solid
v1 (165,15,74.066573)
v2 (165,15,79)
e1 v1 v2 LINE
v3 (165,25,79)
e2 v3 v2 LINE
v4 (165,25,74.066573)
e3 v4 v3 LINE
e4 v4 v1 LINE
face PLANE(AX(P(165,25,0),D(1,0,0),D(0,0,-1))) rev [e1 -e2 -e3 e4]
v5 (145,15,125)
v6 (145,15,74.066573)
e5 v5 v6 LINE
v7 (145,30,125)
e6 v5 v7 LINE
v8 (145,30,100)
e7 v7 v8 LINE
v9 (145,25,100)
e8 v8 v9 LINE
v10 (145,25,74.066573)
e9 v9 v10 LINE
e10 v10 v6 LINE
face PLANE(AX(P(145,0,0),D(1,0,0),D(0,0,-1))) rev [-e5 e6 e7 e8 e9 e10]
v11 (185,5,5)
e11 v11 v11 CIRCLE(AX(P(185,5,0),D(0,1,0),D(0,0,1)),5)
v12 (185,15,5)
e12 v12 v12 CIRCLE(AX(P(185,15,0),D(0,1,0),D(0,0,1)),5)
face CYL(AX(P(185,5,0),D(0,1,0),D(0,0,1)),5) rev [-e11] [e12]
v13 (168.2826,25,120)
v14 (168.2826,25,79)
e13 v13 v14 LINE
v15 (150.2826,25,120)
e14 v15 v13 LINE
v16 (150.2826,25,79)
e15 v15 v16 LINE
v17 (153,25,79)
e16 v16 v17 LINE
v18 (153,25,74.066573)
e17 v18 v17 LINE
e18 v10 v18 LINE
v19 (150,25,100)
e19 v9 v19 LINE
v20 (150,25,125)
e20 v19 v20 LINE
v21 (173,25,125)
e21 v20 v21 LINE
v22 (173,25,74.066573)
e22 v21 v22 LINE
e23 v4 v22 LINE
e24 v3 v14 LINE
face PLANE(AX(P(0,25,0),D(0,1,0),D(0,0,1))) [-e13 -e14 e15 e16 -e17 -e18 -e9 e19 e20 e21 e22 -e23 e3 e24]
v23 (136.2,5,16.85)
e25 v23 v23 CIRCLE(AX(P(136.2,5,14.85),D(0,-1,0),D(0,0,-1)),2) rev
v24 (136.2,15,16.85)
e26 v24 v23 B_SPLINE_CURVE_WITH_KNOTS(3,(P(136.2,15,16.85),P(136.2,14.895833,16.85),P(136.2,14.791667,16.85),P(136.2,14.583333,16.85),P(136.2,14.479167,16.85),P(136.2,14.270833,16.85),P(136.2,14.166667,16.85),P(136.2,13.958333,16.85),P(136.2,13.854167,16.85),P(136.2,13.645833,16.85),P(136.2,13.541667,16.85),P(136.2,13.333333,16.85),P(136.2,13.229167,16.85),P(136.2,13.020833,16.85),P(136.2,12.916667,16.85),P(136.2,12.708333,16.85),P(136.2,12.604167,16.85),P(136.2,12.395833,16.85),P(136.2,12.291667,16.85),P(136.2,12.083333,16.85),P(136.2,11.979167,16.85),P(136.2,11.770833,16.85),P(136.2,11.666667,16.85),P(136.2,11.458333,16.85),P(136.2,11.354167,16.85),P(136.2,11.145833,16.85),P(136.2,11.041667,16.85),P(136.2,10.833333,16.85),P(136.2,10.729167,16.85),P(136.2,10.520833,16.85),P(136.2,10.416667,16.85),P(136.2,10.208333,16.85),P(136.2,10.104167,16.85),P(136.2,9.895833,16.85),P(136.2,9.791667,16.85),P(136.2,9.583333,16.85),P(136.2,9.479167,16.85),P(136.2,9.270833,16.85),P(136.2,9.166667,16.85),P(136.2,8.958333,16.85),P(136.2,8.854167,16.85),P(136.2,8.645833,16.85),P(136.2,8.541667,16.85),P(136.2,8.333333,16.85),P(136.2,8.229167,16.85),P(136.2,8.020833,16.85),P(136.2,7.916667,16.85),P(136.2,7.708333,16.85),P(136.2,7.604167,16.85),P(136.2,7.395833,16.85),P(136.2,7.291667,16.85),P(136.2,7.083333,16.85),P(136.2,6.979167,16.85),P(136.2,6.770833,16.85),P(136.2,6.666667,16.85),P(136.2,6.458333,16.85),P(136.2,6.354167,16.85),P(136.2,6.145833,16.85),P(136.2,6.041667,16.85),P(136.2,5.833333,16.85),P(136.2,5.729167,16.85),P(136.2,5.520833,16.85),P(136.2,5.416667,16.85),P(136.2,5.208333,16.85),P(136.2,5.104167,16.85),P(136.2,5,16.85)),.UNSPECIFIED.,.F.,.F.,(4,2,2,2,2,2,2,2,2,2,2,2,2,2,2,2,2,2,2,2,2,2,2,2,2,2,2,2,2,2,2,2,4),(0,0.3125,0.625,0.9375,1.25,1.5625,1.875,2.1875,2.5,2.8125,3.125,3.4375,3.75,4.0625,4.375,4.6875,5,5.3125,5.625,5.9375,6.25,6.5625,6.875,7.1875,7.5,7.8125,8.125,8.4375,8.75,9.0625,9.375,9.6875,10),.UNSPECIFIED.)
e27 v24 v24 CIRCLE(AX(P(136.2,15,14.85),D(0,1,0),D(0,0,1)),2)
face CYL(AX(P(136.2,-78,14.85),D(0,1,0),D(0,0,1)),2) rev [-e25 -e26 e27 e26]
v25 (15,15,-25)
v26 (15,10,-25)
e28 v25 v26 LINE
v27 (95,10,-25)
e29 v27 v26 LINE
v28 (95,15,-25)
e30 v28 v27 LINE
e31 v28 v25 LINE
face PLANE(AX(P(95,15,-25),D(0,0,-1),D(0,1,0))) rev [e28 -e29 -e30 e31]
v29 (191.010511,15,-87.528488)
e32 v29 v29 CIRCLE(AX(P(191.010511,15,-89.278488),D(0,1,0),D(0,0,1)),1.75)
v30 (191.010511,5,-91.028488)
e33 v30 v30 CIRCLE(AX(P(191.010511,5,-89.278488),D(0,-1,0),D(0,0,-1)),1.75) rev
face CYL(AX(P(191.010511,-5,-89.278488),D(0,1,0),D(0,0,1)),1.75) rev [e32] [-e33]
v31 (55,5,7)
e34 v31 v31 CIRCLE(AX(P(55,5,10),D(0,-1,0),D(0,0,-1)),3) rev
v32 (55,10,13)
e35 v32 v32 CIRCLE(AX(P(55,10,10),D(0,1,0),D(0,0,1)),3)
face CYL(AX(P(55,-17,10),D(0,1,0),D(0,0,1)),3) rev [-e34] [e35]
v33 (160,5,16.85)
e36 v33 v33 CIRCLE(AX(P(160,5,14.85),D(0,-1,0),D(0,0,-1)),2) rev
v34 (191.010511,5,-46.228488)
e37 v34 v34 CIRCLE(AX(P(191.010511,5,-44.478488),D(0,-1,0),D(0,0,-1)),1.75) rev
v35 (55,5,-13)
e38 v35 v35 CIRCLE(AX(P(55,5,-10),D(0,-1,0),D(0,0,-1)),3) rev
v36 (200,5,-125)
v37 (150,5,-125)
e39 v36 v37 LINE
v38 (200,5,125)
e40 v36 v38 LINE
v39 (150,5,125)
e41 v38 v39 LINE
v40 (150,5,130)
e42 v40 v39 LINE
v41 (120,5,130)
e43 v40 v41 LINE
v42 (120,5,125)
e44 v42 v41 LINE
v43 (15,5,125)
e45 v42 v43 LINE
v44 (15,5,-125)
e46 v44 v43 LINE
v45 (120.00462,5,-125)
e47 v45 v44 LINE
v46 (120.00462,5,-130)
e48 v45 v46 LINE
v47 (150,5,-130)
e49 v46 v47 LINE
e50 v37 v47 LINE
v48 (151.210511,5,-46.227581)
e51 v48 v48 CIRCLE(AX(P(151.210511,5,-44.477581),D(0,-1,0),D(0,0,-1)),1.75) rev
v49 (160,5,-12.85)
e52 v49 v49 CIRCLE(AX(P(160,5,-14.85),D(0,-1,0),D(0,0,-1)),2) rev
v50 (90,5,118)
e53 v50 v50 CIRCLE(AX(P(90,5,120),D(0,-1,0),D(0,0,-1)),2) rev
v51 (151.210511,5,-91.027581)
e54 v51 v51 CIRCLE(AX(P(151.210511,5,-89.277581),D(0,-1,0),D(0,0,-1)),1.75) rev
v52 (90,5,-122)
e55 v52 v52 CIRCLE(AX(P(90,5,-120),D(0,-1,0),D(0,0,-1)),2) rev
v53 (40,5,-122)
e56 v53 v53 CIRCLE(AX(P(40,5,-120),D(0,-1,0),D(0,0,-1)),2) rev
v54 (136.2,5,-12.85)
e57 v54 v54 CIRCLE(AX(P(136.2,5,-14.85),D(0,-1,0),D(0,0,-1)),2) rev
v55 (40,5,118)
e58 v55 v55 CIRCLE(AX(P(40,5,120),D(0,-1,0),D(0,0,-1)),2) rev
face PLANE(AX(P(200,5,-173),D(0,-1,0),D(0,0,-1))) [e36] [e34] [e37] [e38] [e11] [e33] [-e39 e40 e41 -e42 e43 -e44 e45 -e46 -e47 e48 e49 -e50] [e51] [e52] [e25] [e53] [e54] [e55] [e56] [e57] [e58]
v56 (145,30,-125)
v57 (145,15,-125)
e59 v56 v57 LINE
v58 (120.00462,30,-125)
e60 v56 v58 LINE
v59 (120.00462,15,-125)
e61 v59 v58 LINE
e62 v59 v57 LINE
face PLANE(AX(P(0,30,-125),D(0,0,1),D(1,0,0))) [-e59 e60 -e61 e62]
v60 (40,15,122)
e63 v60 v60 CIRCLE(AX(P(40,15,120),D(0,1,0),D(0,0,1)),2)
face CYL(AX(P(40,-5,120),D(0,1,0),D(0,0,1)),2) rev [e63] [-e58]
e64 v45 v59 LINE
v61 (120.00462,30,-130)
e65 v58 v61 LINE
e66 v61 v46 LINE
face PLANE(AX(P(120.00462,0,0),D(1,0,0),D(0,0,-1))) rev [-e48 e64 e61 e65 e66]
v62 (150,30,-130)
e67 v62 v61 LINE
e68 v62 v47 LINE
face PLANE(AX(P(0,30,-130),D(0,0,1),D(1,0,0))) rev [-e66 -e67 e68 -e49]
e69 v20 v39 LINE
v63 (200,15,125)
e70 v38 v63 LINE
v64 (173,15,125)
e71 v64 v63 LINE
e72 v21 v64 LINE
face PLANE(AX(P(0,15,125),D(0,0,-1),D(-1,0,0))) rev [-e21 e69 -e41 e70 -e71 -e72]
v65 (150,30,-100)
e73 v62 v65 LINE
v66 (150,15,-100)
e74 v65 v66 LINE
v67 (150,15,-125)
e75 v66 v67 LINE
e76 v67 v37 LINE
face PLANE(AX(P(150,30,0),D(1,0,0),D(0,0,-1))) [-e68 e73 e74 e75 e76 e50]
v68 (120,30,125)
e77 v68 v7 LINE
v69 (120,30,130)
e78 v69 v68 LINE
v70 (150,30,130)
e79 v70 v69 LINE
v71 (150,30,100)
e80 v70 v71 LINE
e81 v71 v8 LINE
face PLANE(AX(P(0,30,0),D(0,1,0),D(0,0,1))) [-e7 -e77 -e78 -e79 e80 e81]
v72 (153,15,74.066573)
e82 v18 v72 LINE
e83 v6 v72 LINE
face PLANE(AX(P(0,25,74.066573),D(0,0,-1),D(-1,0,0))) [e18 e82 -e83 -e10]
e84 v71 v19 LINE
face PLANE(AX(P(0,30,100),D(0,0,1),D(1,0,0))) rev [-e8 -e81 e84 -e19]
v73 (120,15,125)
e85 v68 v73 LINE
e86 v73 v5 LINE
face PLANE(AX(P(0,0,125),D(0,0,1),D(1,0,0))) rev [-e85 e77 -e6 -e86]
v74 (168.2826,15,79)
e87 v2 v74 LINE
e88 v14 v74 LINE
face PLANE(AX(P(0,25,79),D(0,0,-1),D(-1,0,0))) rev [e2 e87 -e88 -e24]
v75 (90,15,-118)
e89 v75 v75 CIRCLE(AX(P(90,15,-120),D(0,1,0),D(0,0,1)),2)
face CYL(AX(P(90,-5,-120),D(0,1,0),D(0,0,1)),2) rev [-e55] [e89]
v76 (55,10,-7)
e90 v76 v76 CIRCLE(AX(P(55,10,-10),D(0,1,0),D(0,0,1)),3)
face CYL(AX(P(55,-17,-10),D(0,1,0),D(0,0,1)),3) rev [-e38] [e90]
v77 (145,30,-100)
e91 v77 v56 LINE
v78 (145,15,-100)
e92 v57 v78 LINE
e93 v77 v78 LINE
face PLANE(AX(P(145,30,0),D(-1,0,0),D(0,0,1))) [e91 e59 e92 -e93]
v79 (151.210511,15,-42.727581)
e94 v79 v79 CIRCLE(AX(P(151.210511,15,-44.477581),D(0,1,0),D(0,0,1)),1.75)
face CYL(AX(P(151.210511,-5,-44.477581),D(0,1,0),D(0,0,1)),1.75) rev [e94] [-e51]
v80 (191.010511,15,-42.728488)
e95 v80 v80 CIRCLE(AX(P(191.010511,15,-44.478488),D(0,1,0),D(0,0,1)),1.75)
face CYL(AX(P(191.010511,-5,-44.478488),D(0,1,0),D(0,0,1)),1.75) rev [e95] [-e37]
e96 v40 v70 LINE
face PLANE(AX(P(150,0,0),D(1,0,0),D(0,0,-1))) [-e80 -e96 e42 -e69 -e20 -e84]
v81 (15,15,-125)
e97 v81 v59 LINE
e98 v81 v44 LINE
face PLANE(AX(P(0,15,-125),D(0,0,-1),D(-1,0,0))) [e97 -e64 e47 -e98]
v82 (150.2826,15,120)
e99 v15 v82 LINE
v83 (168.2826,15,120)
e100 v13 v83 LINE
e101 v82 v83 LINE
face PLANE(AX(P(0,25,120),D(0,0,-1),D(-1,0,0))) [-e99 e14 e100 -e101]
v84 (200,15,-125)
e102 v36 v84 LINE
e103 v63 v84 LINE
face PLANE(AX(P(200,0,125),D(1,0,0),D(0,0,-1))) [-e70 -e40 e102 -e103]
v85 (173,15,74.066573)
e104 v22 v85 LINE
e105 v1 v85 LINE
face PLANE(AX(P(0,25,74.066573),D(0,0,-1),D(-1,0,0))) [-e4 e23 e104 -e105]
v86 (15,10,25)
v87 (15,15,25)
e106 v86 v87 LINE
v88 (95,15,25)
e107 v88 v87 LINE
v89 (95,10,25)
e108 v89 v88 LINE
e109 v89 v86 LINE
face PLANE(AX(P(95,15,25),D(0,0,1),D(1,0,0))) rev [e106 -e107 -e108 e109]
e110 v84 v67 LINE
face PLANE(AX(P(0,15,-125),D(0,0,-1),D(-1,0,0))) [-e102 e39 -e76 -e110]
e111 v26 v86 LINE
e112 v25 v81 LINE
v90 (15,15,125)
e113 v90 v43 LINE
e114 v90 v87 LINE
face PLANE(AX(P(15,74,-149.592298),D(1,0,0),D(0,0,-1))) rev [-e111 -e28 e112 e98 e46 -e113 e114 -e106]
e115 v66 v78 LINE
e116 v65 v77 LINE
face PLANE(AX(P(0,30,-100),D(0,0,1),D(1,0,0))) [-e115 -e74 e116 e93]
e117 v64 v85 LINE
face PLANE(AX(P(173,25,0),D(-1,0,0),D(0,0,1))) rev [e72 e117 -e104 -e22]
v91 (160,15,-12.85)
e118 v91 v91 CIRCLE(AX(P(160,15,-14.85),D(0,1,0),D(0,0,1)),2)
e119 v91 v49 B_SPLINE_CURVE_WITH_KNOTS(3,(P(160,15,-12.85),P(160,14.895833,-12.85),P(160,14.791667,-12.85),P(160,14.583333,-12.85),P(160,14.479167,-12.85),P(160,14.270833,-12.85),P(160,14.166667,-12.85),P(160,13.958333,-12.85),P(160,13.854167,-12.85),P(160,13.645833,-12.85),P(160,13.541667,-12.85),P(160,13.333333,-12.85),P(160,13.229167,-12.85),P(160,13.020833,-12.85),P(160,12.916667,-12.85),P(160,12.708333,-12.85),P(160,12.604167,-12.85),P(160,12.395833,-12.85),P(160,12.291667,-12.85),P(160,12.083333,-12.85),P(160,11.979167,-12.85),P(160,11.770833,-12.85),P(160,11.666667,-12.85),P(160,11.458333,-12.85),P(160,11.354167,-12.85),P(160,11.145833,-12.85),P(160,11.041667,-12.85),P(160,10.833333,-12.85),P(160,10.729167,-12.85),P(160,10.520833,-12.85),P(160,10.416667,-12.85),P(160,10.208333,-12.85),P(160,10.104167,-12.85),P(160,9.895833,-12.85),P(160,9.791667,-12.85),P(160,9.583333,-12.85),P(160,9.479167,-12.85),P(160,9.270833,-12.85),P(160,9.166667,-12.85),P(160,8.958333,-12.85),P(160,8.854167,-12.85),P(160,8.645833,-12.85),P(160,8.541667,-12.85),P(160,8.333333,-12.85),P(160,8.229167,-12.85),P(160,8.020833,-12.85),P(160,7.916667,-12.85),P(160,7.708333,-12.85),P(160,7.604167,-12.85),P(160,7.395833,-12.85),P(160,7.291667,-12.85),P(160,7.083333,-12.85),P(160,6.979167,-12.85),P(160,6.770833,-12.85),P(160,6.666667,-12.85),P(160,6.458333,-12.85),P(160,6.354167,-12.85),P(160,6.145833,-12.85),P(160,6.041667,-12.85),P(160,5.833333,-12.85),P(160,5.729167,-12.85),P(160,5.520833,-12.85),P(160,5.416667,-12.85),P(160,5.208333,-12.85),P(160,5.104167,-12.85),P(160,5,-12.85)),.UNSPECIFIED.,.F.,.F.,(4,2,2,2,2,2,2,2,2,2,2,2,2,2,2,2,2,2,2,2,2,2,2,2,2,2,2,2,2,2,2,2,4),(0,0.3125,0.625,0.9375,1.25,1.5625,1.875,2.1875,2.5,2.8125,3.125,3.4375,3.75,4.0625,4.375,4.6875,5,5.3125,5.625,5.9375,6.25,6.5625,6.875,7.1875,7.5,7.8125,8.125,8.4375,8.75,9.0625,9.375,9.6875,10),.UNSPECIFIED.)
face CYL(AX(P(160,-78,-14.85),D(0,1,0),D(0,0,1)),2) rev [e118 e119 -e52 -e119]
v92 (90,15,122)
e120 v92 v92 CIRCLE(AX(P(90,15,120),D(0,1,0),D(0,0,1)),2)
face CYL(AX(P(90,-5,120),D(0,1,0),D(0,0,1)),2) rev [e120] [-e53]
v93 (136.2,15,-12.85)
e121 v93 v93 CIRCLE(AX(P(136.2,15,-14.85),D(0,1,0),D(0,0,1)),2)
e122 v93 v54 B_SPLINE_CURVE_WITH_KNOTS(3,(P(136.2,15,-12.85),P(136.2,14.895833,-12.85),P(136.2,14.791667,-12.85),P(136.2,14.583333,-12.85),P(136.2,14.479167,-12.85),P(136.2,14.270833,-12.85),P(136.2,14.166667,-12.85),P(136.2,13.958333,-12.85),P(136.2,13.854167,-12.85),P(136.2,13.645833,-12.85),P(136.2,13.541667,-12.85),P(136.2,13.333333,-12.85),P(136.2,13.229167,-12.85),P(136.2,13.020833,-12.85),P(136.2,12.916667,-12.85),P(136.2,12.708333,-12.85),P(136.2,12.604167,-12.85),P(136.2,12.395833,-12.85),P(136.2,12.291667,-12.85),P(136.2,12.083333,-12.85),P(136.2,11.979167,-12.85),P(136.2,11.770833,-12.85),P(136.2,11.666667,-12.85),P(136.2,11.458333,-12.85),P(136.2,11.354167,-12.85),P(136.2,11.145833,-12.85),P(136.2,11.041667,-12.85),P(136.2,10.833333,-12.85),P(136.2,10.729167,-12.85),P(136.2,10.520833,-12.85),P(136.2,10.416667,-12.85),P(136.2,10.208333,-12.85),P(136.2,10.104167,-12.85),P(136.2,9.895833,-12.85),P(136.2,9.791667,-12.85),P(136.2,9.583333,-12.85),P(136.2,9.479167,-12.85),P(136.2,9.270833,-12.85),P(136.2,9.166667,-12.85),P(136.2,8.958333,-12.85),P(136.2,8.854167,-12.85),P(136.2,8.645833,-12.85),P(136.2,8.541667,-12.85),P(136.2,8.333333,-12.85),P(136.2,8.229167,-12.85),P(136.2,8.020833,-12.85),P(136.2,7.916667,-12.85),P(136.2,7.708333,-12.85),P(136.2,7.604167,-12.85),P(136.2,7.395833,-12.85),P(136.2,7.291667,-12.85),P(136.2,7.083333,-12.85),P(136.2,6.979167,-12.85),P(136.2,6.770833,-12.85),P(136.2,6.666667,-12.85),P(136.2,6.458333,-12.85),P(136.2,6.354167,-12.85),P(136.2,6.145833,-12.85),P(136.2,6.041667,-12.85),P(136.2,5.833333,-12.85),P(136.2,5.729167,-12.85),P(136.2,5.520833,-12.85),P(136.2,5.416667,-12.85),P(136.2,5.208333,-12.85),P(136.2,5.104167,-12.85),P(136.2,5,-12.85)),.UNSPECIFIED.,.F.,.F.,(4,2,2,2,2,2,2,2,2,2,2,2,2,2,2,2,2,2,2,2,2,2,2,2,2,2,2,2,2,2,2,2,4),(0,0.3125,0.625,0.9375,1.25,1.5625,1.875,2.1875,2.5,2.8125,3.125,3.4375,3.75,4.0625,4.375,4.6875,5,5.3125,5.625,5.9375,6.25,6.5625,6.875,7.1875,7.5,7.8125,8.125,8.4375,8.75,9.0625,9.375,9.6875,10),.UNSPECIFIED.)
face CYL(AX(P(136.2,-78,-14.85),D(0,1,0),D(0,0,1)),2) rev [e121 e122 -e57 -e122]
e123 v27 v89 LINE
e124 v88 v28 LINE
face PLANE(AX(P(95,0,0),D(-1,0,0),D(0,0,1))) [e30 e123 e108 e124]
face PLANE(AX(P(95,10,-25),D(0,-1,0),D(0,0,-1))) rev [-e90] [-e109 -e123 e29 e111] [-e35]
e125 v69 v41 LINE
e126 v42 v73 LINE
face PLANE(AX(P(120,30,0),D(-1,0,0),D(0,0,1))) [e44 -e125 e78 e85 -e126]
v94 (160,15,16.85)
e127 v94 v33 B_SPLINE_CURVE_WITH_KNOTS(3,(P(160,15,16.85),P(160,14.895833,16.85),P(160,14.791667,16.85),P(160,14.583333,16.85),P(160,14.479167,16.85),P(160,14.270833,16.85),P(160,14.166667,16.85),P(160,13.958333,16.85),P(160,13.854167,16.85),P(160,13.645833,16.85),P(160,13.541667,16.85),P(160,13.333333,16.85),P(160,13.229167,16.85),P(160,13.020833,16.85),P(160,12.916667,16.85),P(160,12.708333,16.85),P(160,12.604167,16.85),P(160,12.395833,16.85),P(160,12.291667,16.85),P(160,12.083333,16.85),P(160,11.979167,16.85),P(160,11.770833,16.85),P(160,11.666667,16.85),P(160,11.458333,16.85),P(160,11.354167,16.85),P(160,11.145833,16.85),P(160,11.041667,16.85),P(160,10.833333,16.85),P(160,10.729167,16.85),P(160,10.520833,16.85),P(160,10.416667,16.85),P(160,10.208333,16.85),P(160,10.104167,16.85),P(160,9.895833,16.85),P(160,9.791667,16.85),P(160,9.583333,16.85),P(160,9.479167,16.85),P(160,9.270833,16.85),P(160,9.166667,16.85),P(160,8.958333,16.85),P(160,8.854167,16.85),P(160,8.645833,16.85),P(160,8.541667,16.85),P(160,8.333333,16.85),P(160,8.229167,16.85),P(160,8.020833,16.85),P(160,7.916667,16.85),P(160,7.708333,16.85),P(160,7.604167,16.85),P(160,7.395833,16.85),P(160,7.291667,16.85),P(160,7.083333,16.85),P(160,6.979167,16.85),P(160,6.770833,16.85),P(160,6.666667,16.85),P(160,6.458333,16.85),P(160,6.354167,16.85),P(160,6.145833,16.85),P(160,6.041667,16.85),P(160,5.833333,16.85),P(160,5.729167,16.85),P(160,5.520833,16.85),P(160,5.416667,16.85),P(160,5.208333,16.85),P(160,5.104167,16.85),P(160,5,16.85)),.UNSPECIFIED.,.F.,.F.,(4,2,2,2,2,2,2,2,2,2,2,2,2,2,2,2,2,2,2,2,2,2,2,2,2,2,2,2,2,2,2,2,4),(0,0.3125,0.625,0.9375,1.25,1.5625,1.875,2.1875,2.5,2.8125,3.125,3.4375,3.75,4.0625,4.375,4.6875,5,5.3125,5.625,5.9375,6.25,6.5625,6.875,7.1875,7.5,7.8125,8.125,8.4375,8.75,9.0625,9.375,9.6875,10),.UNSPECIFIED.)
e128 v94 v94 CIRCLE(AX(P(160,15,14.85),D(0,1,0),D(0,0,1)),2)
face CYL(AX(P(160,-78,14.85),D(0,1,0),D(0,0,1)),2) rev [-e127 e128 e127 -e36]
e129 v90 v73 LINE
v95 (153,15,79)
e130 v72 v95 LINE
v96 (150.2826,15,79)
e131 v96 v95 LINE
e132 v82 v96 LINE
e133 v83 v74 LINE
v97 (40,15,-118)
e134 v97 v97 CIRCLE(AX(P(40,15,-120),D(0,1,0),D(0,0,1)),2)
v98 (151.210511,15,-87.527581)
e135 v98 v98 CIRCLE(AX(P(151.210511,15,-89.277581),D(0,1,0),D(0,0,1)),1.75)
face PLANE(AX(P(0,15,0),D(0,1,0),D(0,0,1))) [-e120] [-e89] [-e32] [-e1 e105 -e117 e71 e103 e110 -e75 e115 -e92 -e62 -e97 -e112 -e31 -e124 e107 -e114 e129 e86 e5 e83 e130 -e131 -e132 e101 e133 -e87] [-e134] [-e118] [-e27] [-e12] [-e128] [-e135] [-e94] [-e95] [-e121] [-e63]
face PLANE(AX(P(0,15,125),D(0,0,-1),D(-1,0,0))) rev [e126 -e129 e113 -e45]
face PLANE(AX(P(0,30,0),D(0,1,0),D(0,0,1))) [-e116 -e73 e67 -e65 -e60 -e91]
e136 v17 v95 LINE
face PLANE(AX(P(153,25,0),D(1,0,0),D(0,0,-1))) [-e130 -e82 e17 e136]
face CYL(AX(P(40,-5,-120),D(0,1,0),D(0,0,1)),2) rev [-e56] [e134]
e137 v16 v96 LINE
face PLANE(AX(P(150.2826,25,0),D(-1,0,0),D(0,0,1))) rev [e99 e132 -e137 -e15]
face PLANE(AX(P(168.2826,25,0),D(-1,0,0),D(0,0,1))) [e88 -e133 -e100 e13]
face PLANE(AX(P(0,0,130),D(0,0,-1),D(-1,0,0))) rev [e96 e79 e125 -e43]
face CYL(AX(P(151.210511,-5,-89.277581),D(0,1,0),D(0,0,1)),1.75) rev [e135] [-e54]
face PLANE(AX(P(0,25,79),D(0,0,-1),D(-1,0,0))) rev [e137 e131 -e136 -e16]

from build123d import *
from OCP.BRepFilletAPI import BRepFilletAPI_MakeChamfer

# Parameters (mm, degrees)
AUFSATZ_LINEAR_AUSTRAGEN1_DEPTH       = 15
SKIZZE2_W                             = 5
SKIZZE2_H                             = 4
SKIZZE2_H_2                           = 3
AUFSATZ_LINEAR_AUSTRAGEN2_DEPTH       = 37
AUFSATZ_LINEAR_AUSTRAGEN3_DEPTH       = 15
SKIZZE4_W                             = 5
SKIZZE4_H                             = 250
AUFSATZ_LINEAR_AUSTRAGEN4_DEPTH       = 15
SKIZZE5_W                             = 30
SKIZZE5_H                             = 5
AUFSATZ_LINEAR_AUSTRAGEN5_DEPTH       = 30
AUFSATZ_LINEAR_AUSTRAGEN6_DEPTH       = 15
AUFSATZ_LINEAR_AUSTRAGEN6_2_DEPTH     = 15
SKIZZE7_W                             = 5
SKIZZE7_H                             = 5
AUFSATZ_LINEAR_AUSTRAGEN7_DEPTH       = 15
AUFSATZ_LINEAR_AUSTRAGEN8_DEPTH       = 15
AUFSATZ_LINEAR_AUSTRAGEN8_DEPTH_BACK  = 15
SKIZZE8_W                             = 5
SKIZZE8_H                             = 30.74644599
SKIZZE8_H_2                           = 29.008771532
SKIZZE9_W                             = 5
SKIZZE9_H                             = 5
AUFSATZ_LINEAR_AUSTRAGEN10_DEPTH      = 15
SKIZZE10_W                            = 5
SKIZZE10_H                            = 30
SCHNITT_LINEAR_AUSTRAGEN1_DEPTH       = 1.01
SKIZZE12_W                            = 10.711230156
SKIZZE12_H                            = 5
SKIZZE12_W_2                          = 5
SKIZZE12_H_2                          = 5.74644599
SKIZZE12_H_3                          = 4.008771532
SKIZZE12_W_3                          = 18.406645612
SKIZZE12_H_4                          = 11.130363441
SKIZZE12_W_4                          = 9.588104439
SKIZZE12_H_5                          = 13.193622238
SCHNITT_LINEAR_AUSTRAGEN2_DEPTH       = 15
SKIZZE13_W                            = 10.711230156
SKIZZE13_H                            = 5
SKIZZE13_W_2                          = 9.588104439
SKIZZE13_W_3                          = 5
SKIZZE13_H_2                          = 13.193622238
SKIZZE13_H_3                          = 11.130363441
SKIZZE13_W_4                          = 18.406645612
SCHNITT_LINEAR_AUSTRAGEN3_DEPTH       = 15
SKIZZE14_W                            = 50
SKIZZE14_H                            = 50
SKIZZE14_W_2                          = 20
AUFSATZ_LINEAR_AUSTRAGEN11_DEPTH      = 20
FASE2_SIZE                            = 20
FASE2_SIZE2                           = 50
FASE3_SIZE                            = 20
FASE3_SIZE2                           = 35
FASE4_SIZE                            = 20
SKIZZE15_R                            = 10
SKIZZE15_R_2                          = 7.5
AUFSATZ_LINEAR_AUSTRAGEN12_DEPTH      = 3
VERRUNDUNG1_R                         = 10
SKIZZE18_R                            = 10
SKIZZE18_R_2                          = 7.5
AUFSATZ_LINEAR_AUSTRAGEN13_DEPTH      = 3
VERRUNDUNG2_R                         = 10
SKIZZE19_R                            = 10
AUFSATZ_LINEAR_AUSTRAGEN14_DEPTH      = 3
VERRUNDUNG3_R                         = 10
SKIZZE20_R                            = 1.5
SCHNITT_LINEAR_AUSTRAGEN4_DEPTH       = 250
SKIZZE21_W                            = 4
SKIZZE21_H                            = 7
SKIZZE21_H_2                          = 5.2
SKIZZE21_W_2                          = 41
AUFSATZ_LINEAR_AUSTRAGEN15_DEPTH      = 10
SKIZZE22_R                            = 1.75
SCHNITT_LINEAR_AUSTRAGEN5_DEPTH       = 20
SCHNITT_LINEAR_AUSTRAGEN6_DEPTH       = 59
SCHNITT_LINEAR_AUSTRAGEN6_DEPTH_BACK  = 47
SKIZZE23_W                            = 190
SKIZZE23_H                            = 302.641157469
SKIZZE24_W                            = 50
SKIZZE24_H                            = 5
SCHNITT_LINEAR_AUSTRAGEN7_DEPTH       = 80
SKIZZE25_R                            = 12.5
SCHNITT_LINEAR_AUSTRAGEN8_DEPTH       = 80
SKIZZE26_R                            = 17.590862423
AUFSATZ_LINEAR_AUSTRAGEN16_DEPTH      = 10
SKIZZE27_R                            = 3
SCHNITT_LINEAR_AUSTRAGEN10_DEPTH      = 93
SKIZZE28_R                            = 2
SCHNITT_LINEAR_AUSTRAGEN11_DEPTH      = 93
SKIZZE29_R                            = 2
SCHNITT_LINEAR_AUSTRAGEN13_DEPTH      = 20
SKIZZE30_W                            = 80
SKIZZE30_H                            = 50
AUFSATZ_LINEAR_AUSTRAGEN17_DEPTH      = 7
SKIZZE31_R                            = 3
SCHNITT_LINEAR_AUSTRAGEN14_DEPTH      = 27
AUFSATZ_LINEAR_START                  = -9
SKIZZE32_R                            = 3
SKIZZE32_R_2                          = 3.723627145
SKIZZE32_R_3                          = 5.253378479
SKIZZE32_R_4                          = 5.58705402
AUFSATZ_LINEAR_AUSTRAGEN18_DEPTH      = 9
SKIZZE35_R                            = 1.75
SCHNITT_LINEAR_AUSTRAGEN16_DEPTH      = 20
SKIZZE36_R                            = 6.846616126
SKIZZE36_R_2                          = 4.471320942
SKIZZE36_R_3                          = 4.89424988
SKIZZE36_R_4                          = 3.525123697
AUFSATZ_LINEAR_AUSTRAGEN19_DEPTH      = 15
SKIZZE39_W                            = 50
SKIZZE39_H                            = 250
SCHNITT_LINEAR_AUSTRAGEN17_DEPTH      = 57
SKIZZE40_W                            = 11.456450468
SKIZZE40_H                            = 117.894868185
SCHNITT_LINEAR_AUSTRAGEN18_DEPTH      = 86
SKIZZE41_W                            = 5.359084078
SKIZZE41_H                            = 0.710531035
SCHNITT_LINEAR_AUSTRAGEN19_DEPTH      = 69
AUFSATZ_LINEAR_AUSTRAGEN20_DEPTH      = 10
SCHNITT_LINEAR_AUSTRAGEN20_DEPTH      = 48
SCHNITT_LINEAR_AUSTRAGEN20_DEPTH_BACK = 345
SKIZZE44_W                            = 185
SKIZZE44_H                            = 5
SKIZZE45_R                            = 5
SCHNITT_LINEAR_AUSTRAGEN21_DEPTH      = 10


with BuildPart() as part:
    # Skizze1 → Aufsatz-Linear austragen1 (new body)
    with BuildSketch(Plane(origin=(0, 0, 0), x_dir=(1, 0, 0), z_dir=(0, 1, 0))):
        Polygon((-105, 65), (-175, 65), (-175, -65), (-105, -65), (-105, -125), (145, -125), (185, -20), (175, -20), (175, 0), (175, 20), (185, 20), (145, 125), (-105, 125), align=None)
        Polygon((175, 0), (175, 20), (185, 20), (185, 0), (185, -20), (175, -20), align=None)
    extrude(amount=AUFSATZ_LINEAR_AUSTRAGEN1_DEPTH)

    # Skizze2 → Aufsatz-Linear austragen2 (add)
    with BuildSketch(Plane(origin=(0, 15, 0), x_dir=(1, 0, 0), z_dir=(0, 1, 0))):
        with Locations((-122.5, -40)):
            Rectangle(SKIZZE2_W, SKIZZE2_H)
        with Locations((-122.5, 40)):
            Rectangle(SKIZZE2_W, SKIZZE2_H)
        with Locations((-122.5, 63.5)):
            Rectangle(SKIZZE2_W, SKIZZE2_H_2)
        with Locations((-122.5, -63.5)):
            Rectangle(SKIZZE2_W, SKIZZE2_H_2)
    extrude(amount=-AUFSATZ_LINEAR_AUSTRAGEN2_DEPTH)

    # Skizze3 → Aufsatz-Linear austragen3 (add)
    with BuildSketch(Plane(origin=(0, 15, 0), x_dir=(1, 0, 0), z_dir=(0, 1, 0))):
        Polygon((145, -125), (195, -125), (195, 125), (145, 125), (185, 20), (185, -20), align=None)
    extrude(amount=-AUFSATZ_LINEAR_AUSTRAGEN3_DEPTH)

    # Skizze4 → Aufsatz-Linear austragen4 (add)
    with BuildSketch(Plane(origin=(0, 15, 0), x_dir=(1, 0, 0), z_dir=(0, 1, 0))):
        with Locations((197.5, 0)):
            Rectangle(SKIZZE4_W, SKIZZE4_H)
    extrude(amount=-AUFSATZ_LINEAR_AUSTRAGEN4_DEPTH)

    # Skizze5 → Aufsatz-Linear austragen5 (add)
    with BuildSketch(Plane(origin=(0, 15, 0), x_dir=(1, 0, 0), z_dir=(0, 1, 0))):
        with Locations((-90, 122.5)):
            Rectangle(SKIZZE5_W, SKIZZE5_H)
        with Locations((-90, -122.5)):
            Rectangle(SKIZZE5_W, SKIZZE5_H)
    extrude(amount=-AUFSATZ_LINEAR_AUSTRAGEN5_DEPTH)



with BuildPart() as body_2:
    # Skizze6 → Aufsatz-Linear austragen6 (new body)
    with BuildSketch(Plane(origin=(0, 15, 0), x_dir=(1, 0, 0), z_dir=(0, 1, 0))):
        Polygon((-61.593354388, 130), (-110, 130), (-110, 88.869636559), (-105, 88.869636559), (-105, 125), (-61.593354388, 125), align=None)
    extrude(amount=AUFSATZ_LINEAR_AUSTRAGEN6_DEPTH)


with BuildPart() as body_3:
    # Skizze6 → Aufsatz-Linear austragen6 2 (new body)
    with BuildSketch(Plane(origin=(0, 15, 0), x_dir=(1, 0, 0), z_dir=(0, 1, 0))):
        Polygon((-110, -86.806377762), (-110, -130), (-70.411895561, -130), (-70.411895561, -125), (-105, -125), (-105, -86.806377762), align=None)
    extrude(amount=AUFSATZ_LINEAR_AUSTRAGEN6_2_DEPTH)


with BuildPart() as part_1:
    add(part.part)

    add(body_2.part)  # Aufsatz-Linear austragen7 merges body 2

    add(body_3.part)  # Aufsatz-Linear austragen7 merges body 3
    # Skizze7 → Aufsatz-Linear austragen7 (add)
    with BuildSketch(Plane.XZ):
        Polygon((-110, -88.869636559), (-110, -125), (-105, -125), (-105, -120), (-105, -88.869636559), align=None)
        with Locations((-107.5, -127.5)):
            Rectangle(SKIZZE7_W, SKIZZE7_H)
        Polygon((-105, -125), (-105, -130), (-61.593354388, -130), (-61.593354388, -125), (-75, -125), align=None)
        Polygon((-105, 125), (-110, 125), (-110, 86.806377762), (-105, 86.806377762), (-105, 120), align=None)
        with Locations((-107.5, 127.5)):
            Rectangle(SKIZZE7_W, SKIZZE7_H)
        Polygon((-70.411895561, 130), (-105, 130), (-105, 125), (-75, 125), (-70.411895561, 125), align=None)
    extrude(amount=-AUFSATZ_LINEAR_AUSTRAGEN7_DEPTH)

    # Skizze8 → Aufsatz-Linear austragen8 (add, two sides: drawn at the far end of the back side and taken through both)
    with BuildSketch(Plane(origin=(0, 15, 0), x_dir=(1, 0, 0), z_dir=(0, 1, 0)).offset(-AUFSATZ_LINEAR_AUSTRAGEN8_DEPTH_BACK)):
        with Locations((147.5, -109.626777005)):
            Rectangle(SKIZZE8_W, SKIZZE8_H)
        Polygon((145, -125), (109.288769844, -125), (109.288769844, -130), (150, -130), (150, -125), align=None)
        with Locations((147.5, 110.495614234)):
            Rectangle(SKIZZE8_W, SKIZZE8_H_2)
        Polygon((118.994620346, 130), (118.994620346, 125), (145, 125), (150, 125), (150, 130), align=None)
    extrude(amount=AUFSATZ_LINEAR_AUSTRAGEN8_DEPTH + AUFSATZ_LINEAR_AUSTRAGEN8_DEPTH_BACK)

    # Skizze9 → Aufsatz-Linear austragen10 (add)
    with BuildSketch(Plane(origin=(0, 15, 0), x_dir=(1, 0, 0), z_dir=(0, 1, 0))):
        Polygon((145, 4), (150, 4), (150, 9), (150, 14), (145, 14), align=None)
        with Locations((152.5, 6.5)):
            Rectangle(SKIZZE9_W, SKIZZE9_H)
        Polygon((190, 4), (200, 4), (200, 14), (196, 14), (196, 9), (190, 9), align=None)
        Polygon((196, 105), (200, 105), (200, 125), (150, 125), (150, 120), (196, 120), align=None)
    extrude(amount=AUFSATZ_LINEAR_AUSTRAGEN10_DEPTH)

    # Skizze10 → Schnitt-Linear austragen1 (cut)
    with BuildSketch(Plane.ZY.offset(-118.994620346)):
        with Locations((-127.5, 15)):
            Rectangle(SKIZZE10_W, SKIZZE10_H)
    extrude(amount=-SCHNITT_LINEAR_AUSTRAGEN1_DEPTH, mode=Mode.SUBTRACT)

    # Skizze12 → Schnitt-Linear austragen2 (cut)
    with BuildSketch(Plane(origin=(0, 15, 0), x_dir=(1, 0, 0), z_dir=(0, 1, 0))):
        with Locations((114.644384922, -127.5)):
            Rectangle(SKIZZE12_W, SKIZZE12_H)
        with Locations((147.5, -97.126777005)):
            Rectangle(SKIZZE12_W_2, SKIZZE12_H_2)
        with Locations((147.5, 97.995614234)):
            Rectangle(SKIZZE12_W_2, SKIZZE12_H_3)
        with Locations((-70.796677194, 127.5)):
            Rectangle(SKIZZE12_W_3, SKIZZE12_H)
        with Locations((-107.5, 94.43481828)):
            Rectangle(SKIZZE12_W_2, SKIZZE12_H_4)
        with Locations((-75.20594778, -127.5)):
            Rectangle(SKIZZE12_W_4, SKIZZE12_H)
        with Locations((-107.5, -93.403188881)):
            Rectangle(SKIZZE12_W_2, SKIZZE12_H_5)
    extrude(amount=SCHNITT_LINEAR_AUSTRAGEN2_DEPTH, mode=Mode.SUBTRACT)

    # Skizze13 → Schnitt-Linear austragen3 (cut)
    with BuildSketch(Plane(origin=(0, 15, 0), x_dir=(1, 0, 0), z_dir=(0, 1, 0))):
        with Locations((114.644384922, -127.5)):
            Rectangle(SKIZZE13_W, SKIZZE13_H)
        with Locations((-75.20594778, -127.5)):
            Rectangle(SKIZZE13_W_2, SKIZZE13_H)
        with Locations((-107.5, -93.403188881)):
            Rectangle(SKIZZE13_W_3, SKIZZE13_H_2)
        with Locations((-107.5, 94.43481828)):
            Rectangle(SKIZZE13_W_3, SKIZZE13_H_3)
        with Locations((-70.796677194, 127.5)):
            Rectangle(SKIZZE13_W_4, SKIZZE13_H)
    extrude(amount=-SCHNITT_LINEAR_AUSTRAGEN3_DEPTH, mode=Mode.SUBTRACT)

    # Skizze14 → Aufsatz-Linear austragen11 (add)
    with BuildSketch(Plane(origin=(0, 15, 0), x_dir=(1, 0, 0), z_dir=(0, 1, 0))):
        Polygon((-175, -25), (-175, -65), (-105, -65), (-105, -25), (-125, -25), align=None)
        with Locations((-150, 0)):
            Rectangle(SKIZZE14_W, SKIZZE14_H)
        with Locations((-115, 0)):
            Rectangle(SKIZZE14_W_2, SKIZZE14_H)
        Polygon((-175, 65), (-175, 25), (-125, 25), (-105, 25), (-105, 65), align=None)
    extrude(amount=AUFSATZ_LINEAR_AUSTRAGEN11_DEPTH)

    # Fase2
    fase2_edges = [part_1.edges().sort_by_distance(p)[0] for p in [
        (-175, 35, 0),
    ]]
    fase2_side = [part_1.faces().sort_by_distance(p)[0] for p in [
        (-175, 17.5, 0),
    ]]
    chamfer(fase2_edges, length=FASE2_SIZE, length2=FASE2_SIZE2, reference=fase2_side[0])

    # Fase3: one chamfer whose edges measure the first distance from different faces: ONE call of the kernel's chamfer builder (chamfer() names one face for all edges)
    fase3_edges_1 = [part_1.edges().sort_by_distance(p)[0] for p in [
        (-115, 35, -65),
    ]]
    fase3_side_1 = [part_1.faces().sort_by_distance(p)[0] for p in [
        (-134.615695793, 13.348705502, -65),
    ]]
    fase3_edges_2 = [part_1.edges().sort_by_distance(p)[0] for p in [
        (-115, 35, 65),
    ]]
    fase3_side_2 = [part_1.faces().sort_by_distance(p)[0] for p in [
        (-134.615695793, 13.348705502, 65),
    ]]
    fase3 = BRepFilletAPI_MakeChamfer(part_1.part.solid().wrapped)
    for e in fase3_edges_1:
        fase3.Add(FASE3_SIZE, FASE3_SIZE2, e.wrapped, fase3_side_1[0].wrapped)  # the first distance lies on this face
    for e in fase3_edges_2:
        fase3.Add(FASE3_SIZE, FASE3_SIZE2, e.wrapped, fase3_side_2[0].wrapped)  # the first distance lies on this face
    add(Compound.cast(fase3.Shape()), mode=Mode.REPLACE)

    # Fase4
    fase4_edges = [part_1.edges().sort_by_distance(p)[0] for p in [
        (-150, 25, 47.5),
        (-150, 25, -47.5),
    ]]
    chamfer(fase4_edges, length=FASE4_SIZE)

    # Skizze15 → Aufsatz-Linear austragen12 (add)
    with BuildSketch(Plane(origin=(-11.551963806, 55.886277719, -15.432210402), x_dir=(0.9807222582245502, 0.18835756766165584, -0.05201229592628623), z_dir=(-0.19540688888301463, 0.9453426139004438, -0.2610430809673718))):
        with Locations(Location((-117.284914164, 20.601047932, 0), (0, 0, 270))):
            Circle(SKIZZE15_R)
        with Locations(Location((-142.839757147, 36.315690789, 0), (0, 0, 270))):
            Circle(SKIZZE15_R_2)
    extrude(amount=AUFSATZ_LINEAR_AUSTRAGEN12_DEPTH)

    # Verrundung1
    # the kernel refuses this fillet: 10 mm, written as the material it takes off along each edge
    with BuildSketch(Plane(origin=(-127.162110348, 31.147334465, -29.972945243), x_dir=(0, 0.26617432079083353, 0.963924909394678), z_dir=(-0.9807222582245501, -0.18835756766165582, 0.052012295926286305))) as verrundung1_piece_1:
        with BuildLine():
            CenterArc((2.858571571, -10), VERRUNDUNG1_R, 44.427004001, 45.572995999)
            Line((2.858571571, 0), (2.858571571, 0.2))
            Line((2.858571571, 0.2), (10, 0.2))
            Line((10, 0.2), (10.2, 0))
            ThreePointArc((10.2, 0), (10.2, -1.5), (10.142828569, -2.86))
            Line((10.142828569, -2.86), (10, -3))
        make_face()
    revolve(axis=Axis((-127.162110348, 31.147334465, -29.972945243), (-0.19540688888301466, 0.9453426139004438, -0.2610430809673718)), mode=Mode.SUBTRACT)
    with BuildSketch(Plane(origin=(-152.224313666, 22.15105201, -43.791514879), x_dir=(0, 0.26617432079083364, 0.9639249093946781), z_dir=(-0.9807222582245503, -0.18835756766165584, 0.052012295926286325))) as verrundung1_piece_2:
        with BuildLine():
            CenterArc((0.358571571, -10), VERRUNDUNG1_R, 44.427004001, 45.572995999)
            Line((0.358571571, 0), (0.358571571, 0.2))
            Line((0.358571571, 0.2), (7.5, 0.2))
            Line((7.5, 0.2), (7.7, 0))
            ThreePointArc((7.7, 0), (7.7, -1.5), (7.642828569, -2.86))
            Line((7.642828569, -2.86), (7.5, -3))
        make_face()
    revolve(axis=Axis((-152.224313666, 22.15105201, -43.791514879), (-0.19540688888301466, 0.9453426139004438, -0.2610430809673718)), mode=Mode.SUBTRACT)

    # Skizze18 → Aufsatz-Linear austragen13 (add)
    with BuildSketch(Plane(origin=(-11.551963806, 55.886277719, 15.432210402), x_dir=(0.9807222582245502, 0.18835756766165587, 0.05201229592628629), z_dir=(-0.19540688888301466, 0.9453426139004437, 0.261043080967372))):
        with Locations(Location((-117.284914164, -25.97894302, 0), (0, 0, 270))):
            Circle(SKIZZE18_R)
        with Locations(Location((-147.284914164, -39.72137923, 0), (0, 0, 270))):
            Circle(SKIZZE18_R_2)
    extrude(amount=AUFSATZ_LINEAR_AUSTRAGEN13_DEPTH)

    # Verrundung2
    # the kernel refuses this fillet: 10 mm, written as the material it takes off along each edge
    with BuildSketch(Plane(origin=(-127.162110348, 29.715876892, 35.156832279), x_dir=(0, -0.26617432079083353, 0.963924909394678), z_dir=(-0.98072225822455, -0.1883575676616558, -0.0520122959262863))) as verrundung2_piece_1:
        with BuildLine():
            CenterArc((2.858571571, -10), VERRUNDUNG2_R, 44.427004001, 45.572995999)
            Line((2.858571571, 0), (2.858571571, 0.2))
            Line((2.858571571, 0.2), (10, 0.2))
            Line((10, 0.2), (10.2, 0))
            ThreePointArc((10.2, 0), (10.2, -1.5), (10.142828569, -2.86))
            Line((10.142828569, -2.86), (10, -3))
        make_face()
    revolve(axis=Axis((-127.162110348, 29.715876892, 35.156832279), (-0.19540688888301463, 0.9453426139004436, 0.26104308096737205)), mode=Mode.SUBTRACT)
    with BuildSketch(Plane(origin=(-156.583778094, 20.407266239, 46.843139979), x_dir=(0, -0.26617432079083425, 0.9639249093946779), z_dir=(-0.9807222582245501, -0.18835756766165576, -0.05201229592628644))) as verrundung2_piece_2:
        with BuildLine():
            CenterArc((0.358571571, -10), VERRUNDUNG2_R, 44.427004001, 45.572995999)
            Line((0.358571571, 0), (0.358571571, 0.2))
            Line((0.358571571, 0.2), (7.5, 0.2))
            Line((7.5, 0.2), (7.7, 0))
            ThreePointArc((7.7, 0), (7.7, -1.5), (7.642828569, -2.86))
            Line((7.642828569, -2.86), (7.5, -3))
        make_face()
    revolve(axis=Axis((-156.583778094, 20.407266239, 46.843139979), (-0.19540688888301463, 0.9453426139004436, 0.26104308096737205)), mode=Mode.SUBTRACT)

    # Skizze19 → Aufsatz-Linear austragen14 (add)
    with BuildSketch(Plane(origin=(-29.310344828, 73.275862069, 0), x_dir=(0.9284766908852605, 0.371390676354101, 0), z_dir=(-0.371390676354101, 0.9284766908852605, 0))):
        with Locations(Location((-118.060912688, -0.063197478, 0), (0, 0, 180))):
            Circle(SKIZZE19_R)
        with Locations(Location((-139.860763151, 12.174715734, 0), (0, 0, 180))):
            Circle(SKIZZE19_R)
        with Locations(Location((-139.91256076, -12.208380744, 0), (0, 0, 180))):
            Circle(SKIZZE19_R)
    extrude(amount=AUFSATZ_LINEAR_AUSTRAGEN14_DEPTH)

    # Verrundung3
    # the kernel refuses this fillet: 10 mm, written as the material it takes off along each edge
    with BuildSketch(Plane(origin=(-140.041322392, 32.214569927, 0.063197478), x_dir=(-0.9284766908852606, -0.37139067635410067, 0), z_dir=(0, 0, -1))) as verrundung3_piece_1:
        with BuildLine():
            CenterArc((2.858571571, -10), VERRUNDUNG3_R, 44.427004001, 45.572995999)
            Line((2.858571571, 0), (2.858571571, 0.2))
            Line((2.858571571, 0.2), (10, 0.2))
            Line((10, 0.2), (10.2, 0))
            ThreePointArc((10.2, 0), (10.2, -1.5), (10.142828569, -2.86))
            Line((10.142828569, -2.86), (10, -3))
        make_face()
    revolve(axis=Axis((-140.041322392, 32.214569927, 0.063197478), (-0.371390676354101, 0.9284766908852605, 0)), mode=Mode.SUBTRACT)
    with BuildSketch(Plane(origin=(-160.281975412, 24.11830872, -12.174715734), x_dir=(-0.9284766908852602, -0.37139067635410167, 0), z_dir=(0, 0, -1))) as verrundung3_piece_2:
        with BuildLine():
            CenterArc((2.858571571, -10), VERRUNDUNG3_R, 44.427004001, 45.572995999)
            Line((2.858571571, 0), (2.858571571, 0.2))
            Line((2.858571571, 0.2), (10, 0.2))
            Line((10, 0.2), (10.2, 0))
            ThreePointArc((10.2, 0), (10.2, -1.5), (10.142828569, -2.86))
            Line((10.142828569, -2.86), (10, -3))
        make_face()
    revolve(axis=Axis((-160.281975412, 24.11830872, -12.174715734), (-0.371390676354101, 0.9284766908852605, 0)), mode=Mode.SUBTRACT)
    with BuildSketch(Plane(origin=(-160.330068284, 24.099071571, 12.208380744), x_dir=(-0.9284766908852602, -0.37139067635410167, 0), z_dir=(0, 0, -1))) as verrundung3_piece_3:
        with BuildLine():
            CenterArc((2.858571571, -10), VERRUNDUNG3_R, 44.427004001, 45.572995999)
            Line((2.858571571, 0), (2.858571571, 0.2))
            Line((2.858571571, 0.2), (10, 0.2))
            Line((10, 0.2), (10.2, 0))
            ThreePointArc((10.2, 0), (10.2, -1.5), (10.142828569, -2.86))
            Line((10.142828569, -2.86), (10, -3))
        make_face()
    revolve(axis=Axis((-160.330068284, 24.099071571, 12.208380744), (-0.371390676354101, 0.9284766908852605, 0)), mode=Mode.SUBTRACT)

    # Skizze20 → Schnitt-Linear austragen4 (cut)
    with BuildSketch(Plane(origin=(0, 0, -65), x_dir=(-1, 0, 0), z_dir=(0, 0, -1))):
        with Locations(Location((122.5, -19.5, 0), (0, 0, 180))):
            Circle(SKIZZE20_R)
        with Locations(Location((122.5, -2.5, 0), (0, 0, 180))):
            Circle(SKIZZE20_R)
    extrude(amount=-SCHNITT_LINEAR_AUSTRAGEN4_DEPTH, mode=Mode.SUBTRACT)

    # Skizze21 → Aufsatz-Linear austragen15 (add)
    with BuildSketch(Plane(origin=(0, 15, 0), x_dir=(1, 0, 0), z_dir=(0, 1, 0))):
        Polygon((145, -100), (150, -100), (191, -100), (191, -93), (145, -93), align=None)
        with Locations((193, -96.5)):
            Rectangle(SKIZZE21_W, SKIZZE21_H)
        with Locations((193, -102.6)):
            Rectangle(SKIZZE21_W, SKIZZE21_H_2)
        with Locations((170.5, -121.5)):
            Rectangle(SKIZZE21_W_2, SKIZZE21_H)
        with Locations((193, -121.5)):
            Rectangle(SKIZZE21_W, SKIZZE21_H)
        with Locations((193, -115.4)):
            Rectangle(SKIZZE21_W, SKIZZE21_H_2)
    extrude(amount=AUFSATZ_LINEAR_AUSTRAGEN15_DEPTH)

    # Skizze22 → Schnitt-Linear austragen5 (cut)
    with BuildSketch(Plane(origin=(0, 15, 0), x_dir=(1, 0, 0), z_dir=(0, 1, 0))):
        with Locations(Location((146.069548912, -58.232980191, 0), (0, 0, 270))):
            Circle(SKIZZE22_R)
        with Locations(Location((146.069548912, -13.432980191, 0), (0, 0, 270))):
            Circle(SKIZZE22_R)
        with Locations(Location((185.869548912, -58.232980191, 0), (0, 0, 270))):
            Circle(SKIZZE22_R)
        with Locations(Location((185.869548912, -13.432980191, 0), (0, 0, 270))):
            Circle(SKIZZE22_R)
    extrude(amount=-SCHNITT_LINEAR_AUSTRAGEN5_DEPTH, mode=Mode.SUBTRACT)

    # Skizze23 → Schnitt-Linear austragen6 (cut, two sides: drawn at the far end of the back side and taken through both)
    with BuildSketch(Plane(origin=(0, 15, 0), x_dir=(1, 0, 0), z_dir=(0, 1, 0)).offset(-SCHNITT_LINEAR_AUSTRAGEN6_DEPTH_BACK)):
        with Locations((-80, -1.728280721)):
            Rectangle(SKIZZE23_W, SKIZZE23_H)
    extrude(amount=SCHNITT_LINEAR_AUSTRAGEN6_DEPTH + SCHNITT_LINEAR_AUSTRAGEN6_DEPTH_BACK, mode=Mode.SUBTRACT)

    # Skizze24 → Schnitt-Linear austragen7 (cut)
    with BuildSketch(Plane.ZY.offset(-15)):
        with Locations((0, 12.5)):
            Rectangle(SKIZZE24_W, SKIZZE24_H)
    extrude(amount=-SCHNITT_LINEAR_AUSTRAGEN7_DEPTH, mode=Mode.SUBTRACT)

    # Skizze25 → Schnitt-Linear austragen8 (cut)
    with BuildSketch(Plane(origin=(0, 10, 0), x_dir=(1, 0, 0), z_dir=(0, 1, 0))):
        with Locations(Location((65, 0, 0), (0, 0, 270))):
            Circle(SKIZZE25_R)
    extrude(amount=-SCHNITT_LINEAR_AUSTRAGEN8_DEPTH, mode=Mode.SUBTRACT)

    # Skizze26 → Aufsatz-Linear austragen16 (add)
    with BuildSketch(Plane.XZ):
        with Locations((65, 0)):
            Circle(SKIZZE26_R)
    extrude(amount=-AUFSATZ_LINEAR_AUSTRAGEN16_DEPTH)

    # Skizze27 → Schnitt-Linear austragen10 (cut)
    with BuildSketch(Plane(origin=(0, 15, 0), x_dir=(1, 0, 0), z_dir=(0, 1, 0))):
        with Locations(Location((75, 10, 0), (0, 0, 270))):
            Circle(SKIZZE27_R)
        with Locations(Location((75, -10, 0), (0, 0, 270))):
            Circle(SKIZZE27_R)
        with Locations(Location((35, 10, 0), (0, 0, 270))):
            Circle(SKIZZE27_R)
        with Locations(Location((35, -10, 0), (0, 0, 270))):
            Circle(SKIZZE27_R)
    extrude(amount=-SCHNITT_LINEAR_AUSTRAGEN10_DEPTH, mode=Mode.SUBTRACT)

    # Skizze28 → Schnitt-Linear austragen11 (cut)
    with BuildSketch(Plane(origin=(0, 15, 0), x_dir=(1, 0, 0), z_dir=(0, 1, 0))):
        with Locations(Location((160, 14.85, 0), (0, 0, 270))):
            Circle(SKIZZE28_R)
        with Locations(Location((160, -14.85, 0), (0, 0, 270))):
            Circle(SKIZZE28_R)
        with Locations(Location((136.2, -14.85, 0), (0, 0, 270))):
            Circle(SKIZZE28_R)
        with Locations(Location((136.2, 14.85, 0), (0, 0, 270))):
            Circle(SKIZZE28_R)
    extrude(amount=-SCHNITT_LINEAR_AUSTRAGEN11_DEPTH, mode=Mode.SUBTRACT)

    # Skizze29 → Schnitt-Linear austragen13 (cut)
    with BuildSketch(Plane(origin=(0, 15, 0), x_dir=(1, 0, 0), z_dir=(0, 1, 0))):
        with Locations(Location((90, 120, 0), (0, 0, 270))):
            Circle(SKIZZE29_R)
        with Locations(Location((40, 120, 0), (0, 0, 270))):
            Circle(SKIZZE29_R)
        with Locations(Location((90, -120, 0), (0, 0, 270))):
            Circle(SKIZZE29_R)
        with Locations(Location((40, -120, 0), (0, 0, 270))):
            Circle(SKIZZE29_R)
    extrude(amount=-SCHNITT_LINEAR_AUSTRAGEN13_DEPTH, mode=Mode.SUBTRACT)

    # Skizze30 → Aufsatz-Linear austragen17 (add)
    with BuildSketch(Plane(origin=(0, 10, 0), x_dir=(1, 0, 0), z_dir=(0, 1, 0))):
        with Locations((55, 0)):
            Rectangle(SKIZZE30_W, SKIZZE30_H)
    extrude(amount=-AUFSATZ_LINEAR_AUSTRAGEN17_DEPTH)

    # Skizze31 → Schnitt-Linear austragen14 (cut)
    with BuildSketch(Plane(origin=(0, 10, 0), x_dir=(1, 0, 0), z_dir=(0, 1, 0))):
        with Locations(Location((55, 10, 0), (0, 0, 270))):
            Circle(SKIZZE31_R)
        with Locations(Location((55, -10, 0), (0, 0, 270))):
            Circle(SKIZZE31_R)
    extrude(amount=-SCHNITT_LINEAR_AUSTRAGEN14_DEPTH, mode=Mode.SUBTRACT)

    # Skizze32 → Aufsatz-Linear austragen18 (add)
    with BuildSketch(Plane.XZ.offset(AUFSATZ_LINEAR_START)):
        with Locations((75, -10)):
            Circle(SKIZZE32_R)
        with Locations((75, 10)):
            Circle(SKIZZE32_R_2)
        with Locations((35, 10)):
            Circle(SKIZZE32_R_3)
        with Locations((35, -10)):
            Circle(SKIZZE32_R_4)
    extrude(amount=AUFSATZ_LINEAR_AUSTRAGEN18_DEPTH)

    # Skizze35 → Schnitt-Linear austragen16 (cut)
    with BuildSketch(Plane(origin=(0, 15, 0), x_dir=(1, 0, 0), z_dir=(0, 1, 0))):
        with Locations(Location((151.210510648, 44.477580629, 0), (0, 0, 270))):
            Circle(SKIZZE35_R)
        with Locations(Location((191.010510648, 44.478487984, 0), (0, 0, 270))):
            Circle(SKIZZE35_R)
        with Locations(Location((151.210510648, 89.277580629, 0), (0, 0, 270))):
            Circle(SKIZZE35_R)
        with Locations(Location((191.010510648, 89.278487984, 0), (0, 0, 270))):
            Circle(SKIZZE35_R)
    extrude(amount=-SCHNITT_LINEAR_AUSTRAGEN16_DEPTH, mode=Mode.SUBTRACT)

    # Skizze36 → Aufsatz-Linear austragen19 (add)
    with BuildSketch(Plane(origin=(0, 15, 0), x_dir=(1, 0, 0), z_dir=(0, 1, 0))):
        with Locations((146.097099783, -61.909031942)):
            Circle(SKIZZE36_R)
        with Locations((186.685228416, -57.92608474)):
            Circle(SKIZZE36_R_2)
        with Locations((186.685228416, -12.786016446)):
            Circle(SKIZZE36_R_3)
        with Locations((146.097099783, -12.786016446)):
            Circle(SKIZZE36_R_4)
    extrude(amount=-AUFSATZ_LINEAR_AUSTRAGEN19_DEPTH)

    # Skizze39 → Schnitt-Linear austragen17 (cut)
    with BuildSketch(Plane(origin=(0, 15, 0), x_dir=(1, 0, 0), z_dir=(0, 1, 0))):
        with Locations((175, 0)):
            Rectangle(SKIZZE39_W, SKIZZE39_H)
    extrude(amount=SCHNITT_LINEAR_AUSTRAGEN17_DEPTH, mode=Mode.SUBTRACT)

    # Skizze40 → Schnitt-Linear austragen18 (cut)
    with BuildSketch(Plane(origin=(0, 15, 0), x_dir=(1, 0, 0), z_dir=(0, 1, 0))):
        with Locations((148.530078419, -40.830256609)):
            Rectangle(SKIZZE40_W, SKIZZE40_H)
    extrude(amount=SCHNITT_LINEAR_AUSTRAGEN18_DEPTH, mode=Mode.SUBTRACT)

    # Skizze41 → Schnitt-Linear austragen19 (cut)
    with BuildSketch(Plane(origin=(0, 15, 0), x_dir=(1, 0, 0), z_dir=(0, 1, 0))):
        with Locations((147.679542039, -99.644734483)):
            Rectangle(SKIZZE41_W, SKIZZE41_H)
    extrude(amount=SCHNITT_LINEAR_AUSTRAGEN19_DEPTH, mode=Mode.SUBTRACT)

    # Skizze42 → Aufsatz-Linear austragen20 (add)
    with BuildSketch(Plane(origin=(0, 15, 0), x_dir=(1, 0, 0), z_dir=(0, 1, 0))):
        Polygon((168.282600421, -120), (150.282600421, -120), (150.282600421, -79), (153, -79), (153, -74.066572639), (145, -74.066572639), (145, -100), (150, -100), (150, -125), (173, -125), (173, -74.066572639), (165, -74.066572639), (165, -79), (168.282600421, -79), align=None)
    extrude(amount=AUFSATZ_LINEAR_AUSTRAGEN20_DEPTH)

    # Skizze44 → Schnitt-Linear austragen20 (cut, two sides: drawn at the far end of the back side and taken through both)
    with BuildSketch(Plane(origin=(0, 0, -125), x_dir=(-1, 0, 0), z_dir=(0, 0, -1)).offset(-SCHNITT_LINEAR_AUSTRAGEN20_DEPTH_BACK)):
        with Locations((-107.5, 2.5)):
            Rectangle(SKIZZE44_W, SKIZZE44_H)
    extrude(amount=SCHNITT_LINEAR_AUSTRAGEN20_DEPTH + SCHNITT_LINEAR_AUSTRAGEN20_DEPTH_BACK, mode=Mode.SUBTRACT)

    # Skizze45 → Schnitt-Linear austragen21 (cut)
    with BuildSketch(Plane(origin=(0, 15, 0), x_dir=(1, 0, 0), z_dir=(0, 1, 0))):
        with Locations(Location((185, 0, 0), (0, 0, 270))):
            Circle(SKIZZE45_R)
    extrude(amount=-SCHNITT_LINEAR_AUSTRAGEN21_DEPTH, mode=Mode.SUBTRACT)


solid = part_1.part
